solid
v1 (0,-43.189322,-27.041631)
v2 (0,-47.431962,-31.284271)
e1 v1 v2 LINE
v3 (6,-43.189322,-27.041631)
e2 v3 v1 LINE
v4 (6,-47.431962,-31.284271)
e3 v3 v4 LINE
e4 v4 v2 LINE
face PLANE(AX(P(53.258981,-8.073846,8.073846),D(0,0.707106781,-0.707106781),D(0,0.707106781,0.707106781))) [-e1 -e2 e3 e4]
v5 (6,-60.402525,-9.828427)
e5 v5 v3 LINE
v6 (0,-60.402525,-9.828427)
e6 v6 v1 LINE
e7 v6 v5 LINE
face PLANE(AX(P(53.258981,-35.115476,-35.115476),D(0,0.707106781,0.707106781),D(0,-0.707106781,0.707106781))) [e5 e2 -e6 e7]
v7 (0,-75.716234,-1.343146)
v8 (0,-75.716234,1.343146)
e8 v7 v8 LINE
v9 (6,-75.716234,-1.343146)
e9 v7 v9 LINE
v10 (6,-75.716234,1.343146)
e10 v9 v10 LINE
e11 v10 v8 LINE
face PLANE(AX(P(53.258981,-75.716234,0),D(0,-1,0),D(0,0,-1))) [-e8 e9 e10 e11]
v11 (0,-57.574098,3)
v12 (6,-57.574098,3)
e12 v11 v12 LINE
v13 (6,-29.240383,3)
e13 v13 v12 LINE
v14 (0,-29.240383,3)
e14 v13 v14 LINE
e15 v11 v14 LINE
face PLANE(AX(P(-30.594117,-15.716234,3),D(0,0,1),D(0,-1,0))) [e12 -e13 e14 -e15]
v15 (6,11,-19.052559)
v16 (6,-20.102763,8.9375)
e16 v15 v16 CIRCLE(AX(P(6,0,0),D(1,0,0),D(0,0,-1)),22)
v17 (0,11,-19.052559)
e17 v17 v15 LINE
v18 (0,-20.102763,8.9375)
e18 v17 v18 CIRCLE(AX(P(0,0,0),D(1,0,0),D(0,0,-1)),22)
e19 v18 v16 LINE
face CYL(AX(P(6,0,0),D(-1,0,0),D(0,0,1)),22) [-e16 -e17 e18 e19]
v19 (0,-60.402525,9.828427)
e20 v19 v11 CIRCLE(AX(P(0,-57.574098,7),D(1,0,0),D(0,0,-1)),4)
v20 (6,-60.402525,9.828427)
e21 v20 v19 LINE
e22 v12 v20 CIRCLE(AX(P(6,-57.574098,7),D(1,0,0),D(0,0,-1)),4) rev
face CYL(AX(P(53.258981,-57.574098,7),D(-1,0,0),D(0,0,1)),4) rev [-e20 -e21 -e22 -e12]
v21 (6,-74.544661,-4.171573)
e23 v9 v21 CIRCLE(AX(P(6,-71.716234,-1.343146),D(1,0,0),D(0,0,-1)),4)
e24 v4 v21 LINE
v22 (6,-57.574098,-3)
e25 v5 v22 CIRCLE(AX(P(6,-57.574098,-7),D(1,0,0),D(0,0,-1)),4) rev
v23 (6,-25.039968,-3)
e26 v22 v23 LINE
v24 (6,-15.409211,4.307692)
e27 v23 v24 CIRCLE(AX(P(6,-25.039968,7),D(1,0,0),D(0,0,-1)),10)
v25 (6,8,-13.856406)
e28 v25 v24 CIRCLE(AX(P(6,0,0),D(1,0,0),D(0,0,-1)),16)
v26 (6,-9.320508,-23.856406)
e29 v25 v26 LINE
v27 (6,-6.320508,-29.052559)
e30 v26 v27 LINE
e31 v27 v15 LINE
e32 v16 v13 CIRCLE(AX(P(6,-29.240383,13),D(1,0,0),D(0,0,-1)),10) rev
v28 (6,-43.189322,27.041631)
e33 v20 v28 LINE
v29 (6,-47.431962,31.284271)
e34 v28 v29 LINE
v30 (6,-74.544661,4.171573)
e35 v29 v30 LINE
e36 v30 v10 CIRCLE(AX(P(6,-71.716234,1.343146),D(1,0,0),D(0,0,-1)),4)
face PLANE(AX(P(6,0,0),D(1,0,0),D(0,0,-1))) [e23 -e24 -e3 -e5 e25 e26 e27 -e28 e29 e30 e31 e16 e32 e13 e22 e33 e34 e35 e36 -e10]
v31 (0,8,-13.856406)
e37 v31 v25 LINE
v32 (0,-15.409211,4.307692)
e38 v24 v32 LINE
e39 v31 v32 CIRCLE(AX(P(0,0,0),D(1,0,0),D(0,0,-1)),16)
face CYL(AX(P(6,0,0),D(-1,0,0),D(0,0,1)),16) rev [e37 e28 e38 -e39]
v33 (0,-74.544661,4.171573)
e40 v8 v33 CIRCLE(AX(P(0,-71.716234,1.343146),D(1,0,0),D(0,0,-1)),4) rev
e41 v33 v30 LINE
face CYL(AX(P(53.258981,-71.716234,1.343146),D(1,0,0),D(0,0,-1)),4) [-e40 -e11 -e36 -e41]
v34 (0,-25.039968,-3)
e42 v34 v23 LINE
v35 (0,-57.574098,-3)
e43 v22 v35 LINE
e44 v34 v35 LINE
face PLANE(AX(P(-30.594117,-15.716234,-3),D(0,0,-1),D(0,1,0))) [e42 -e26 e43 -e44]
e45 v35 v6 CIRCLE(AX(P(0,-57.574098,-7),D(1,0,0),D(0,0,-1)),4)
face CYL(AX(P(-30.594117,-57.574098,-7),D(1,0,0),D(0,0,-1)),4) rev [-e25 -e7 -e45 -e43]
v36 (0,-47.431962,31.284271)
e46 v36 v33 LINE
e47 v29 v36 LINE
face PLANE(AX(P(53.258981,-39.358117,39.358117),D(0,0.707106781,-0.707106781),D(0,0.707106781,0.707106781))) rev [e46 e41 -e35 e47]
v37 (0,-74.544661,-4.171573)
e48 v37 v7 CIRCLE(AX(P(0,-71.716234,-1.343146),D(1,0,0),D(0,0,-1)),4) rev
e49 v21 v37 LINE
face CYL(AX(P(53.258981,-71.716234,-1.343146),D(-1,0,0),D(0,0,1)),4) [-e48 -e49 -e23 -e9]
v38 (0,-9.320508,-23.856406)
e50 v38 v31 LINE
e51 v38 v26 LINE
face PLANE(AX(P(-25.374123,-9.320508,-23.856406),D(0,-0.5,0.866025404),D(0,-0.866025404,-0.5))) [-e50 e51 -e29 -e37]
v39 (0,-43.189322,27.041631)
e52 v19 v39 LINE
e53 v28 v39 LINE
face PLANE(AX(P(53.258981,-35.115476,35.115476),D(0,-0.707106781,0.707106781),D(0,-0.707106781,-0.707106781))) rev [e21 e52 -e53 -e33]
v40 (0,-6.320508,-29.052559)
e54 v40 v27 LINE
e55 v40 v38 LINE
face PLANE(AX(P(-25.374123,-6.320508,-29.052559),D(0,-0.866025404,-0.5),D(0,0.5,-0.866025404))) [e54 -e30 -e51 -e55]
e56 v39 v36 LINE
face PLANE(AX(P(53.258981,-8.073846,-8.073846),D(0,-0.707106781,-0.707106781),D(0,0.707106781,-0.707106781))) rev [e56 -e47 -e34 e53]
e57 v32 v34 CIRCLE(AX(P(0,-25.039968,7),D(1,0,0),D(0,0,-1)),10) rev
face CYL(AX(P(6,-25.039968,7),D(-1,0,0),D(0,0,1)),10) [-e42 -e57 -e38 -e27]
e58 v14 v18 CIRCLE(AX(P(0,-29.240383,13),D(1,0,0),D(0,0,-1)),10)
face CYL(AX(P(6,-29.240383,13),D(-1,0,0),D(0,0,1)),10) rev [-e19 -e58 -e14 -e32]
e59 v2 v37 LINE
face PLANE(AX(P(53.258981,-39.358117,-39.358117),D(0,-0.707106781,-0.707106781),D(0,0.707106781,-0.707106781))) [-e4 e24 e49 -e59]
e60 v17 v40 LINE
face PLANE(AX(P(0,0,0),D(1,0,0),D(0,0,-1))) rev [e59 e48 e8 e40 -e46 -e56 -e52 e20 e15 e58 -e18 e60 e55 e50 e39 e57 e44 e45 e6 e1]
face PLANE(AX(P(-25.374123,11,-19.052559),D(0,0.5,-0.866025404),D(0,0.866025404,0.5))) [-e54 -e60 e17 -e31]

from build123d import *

# Parameters (mm, degrees)
SKETCH1_R           = 22
SKETCH1_R_2         = 16
BOSS_EXTRUDE1_DEPTH = 6
BOSS_EXTRUDE2_DEPTH = 6
CUT_EXTRUDE1_DEPTH  = 37.933063475
SKETCH4_W           = 6
SKETCH4_H           = 30
BOSS_EXTRUDE3_DEPTH = 6
CUT_EXTRUDE2_DEPTH  = 55.497937543
FILLET1_R           = 10
FILLET2_R           = 10
SKETCH6_W           = 6
SKETCH6_H           = 30
BOSS_EXTRUDE4_DEPTH = 6
FILLET3_R           = 4


with BuildPart() as part:
    # Sketch1 → Boss-Extrude1 (new body)
    with BuildSketch(Plane(origin=(0, 0, 0), x_dir=(0, 0, -1), z_dir=(1, 0, 0))):
        Circle(SKETCH1_R)
        Circle(SKETCH1_R_2, mode=Mode.SUBTRACT)
    extrude(amount=BOSS_EXTRUDE1_DEPTH)

    # Sketch2 → Boss-Extrude2 (add)
    with BuildSketch(Plane(origin=(6, 0, 0), x_dir=(0, 0, -1), z_dir=(1, 0, 0))):
        Polygon((19.052558883, 11), (29.052558883, -6.320508076), (23.856406461, -9.320508076), (13.856406461, 8), align=None)
    extrude(amount=-BOSS_EXTRUDE2_DEPTH)

    # Sketch3 → Cut-Extrude1 (cut, through all)
    with BuildSketch(Plane(origin=(6, 0, 0), x_dir=(0, 0, -1), z_dir=(1, 0, 0))):
        with BuildLine():
            ThreePointArc((16, 0), (12.693653445, -9.740182864), (4.141104722, -15.454813221))
            Line((4.141104722, -15.454813221), (5.694018992, -21.250368178))
            ThreePointArc((5.694018992, -21.250368178), (15.779826764, -15.329614062), (21.406240896, -5.076696831))
            Line((21.406240896, -5.076696831), (13.856406461, 8))
            ThreePointArc((13.856406461, 8), (15.454813221, 4.141104722), (16, 0))
        make_face()
    extrude(amount=-CUT_EXTRUDE1_DEPTH, mode=Mode.SUBTRACT)

    # Sketch4 → Boss-Extrude3 (add)
    with BuildSketch(Plane(origin=(6, 0, 0), x_dir=(0, 0, -1), z_dir=(1, 0, 0))):
        with Locations((0, -30.716233646)):
            Rectangle(SKETCH4_W, SKETCH4_H)
    extrude(amount=-BOSS_EXTRUDE3_DEPTH)

    # Sketch5 → Cut-Extrude2 (cut, through all)
    with BuildSketch(Plane(origin=(6, 0, 0), x_dir=(0, 0, -1), z_dir=(1, 0, 0))):
        with BuildLine():
            Line((3, -21.794494718), (3, -15.716233646))
            Line((3, -15.716233646), (4.141104722, -15.454813221))
            Line((4.141104722, -15.454813221), (5.694018992, -21.250368178))
            ThreePointArc((5.694018992, -21.250368178), (4.374209957, -21.657103353), (3, -21.794494718))
        make_face()
    extrude(amount=-CUT_EXTRUDE2_DEPTH, mode=Mode.SUBTRACT)

    # Fillet1
    # the kernel refuses this fillet: 10 mm, written as the material it adds along each edge
    with BuildSketch(Plane(origin=(6, -21.794494718, 3), x_dir=(0, -1, 0), z_dir=(-1, 0, 0))) as fillet1_piece_1:
        with BuildLine():
            CenterArc((7.445888317, 10), FILLET1_R, 203.969482318, 66.030517682)
            ThreePointArc((-1.691731382, 5.9375), (-0.636552127, 3.028388286), (0, 0))
            Line((0, 0), (7.445888317, 0))
        make_face()
    extrude(amount=6)
    # the kernel refuses this fillet: 10 mm, written as the material it takes off along each edge
    with BuildSketch(Plane(origin=(28.912878475, -15.716233646, -3), x_dir=(0, -1, 0), z_dir=(-1, 0, 0))) as fillet1_2_piece_1:
        with BuildLine():
            CenterArc((9.16515139, 10), FILLET1_R, 203.578178478, 66.421821522)
            Line((0, 6), (0, 0))
            Line((0, 0), (9.16515139, 0))
        make_face()
    extrude(amount=51.82575695, mode=Mode.SUBTRACT)

    # Fillet2
    fillet2_edges = [part.edges().sort_by_distance(p)[0] for p in [
        (3, -15.716233646, 3),
    ]]
    fillet(fillet2_edges, radius=FILLET2_R)

    # Sketch6 → Boss-Extrude4 (add)
    with BuildSketch(Plane.ZY):
        Polygon((27.04163056, -43.189321711), (3, -67.230952271), (3, -75.716233646), (31.284271247, -47.431962398), align=None)
        with Locations((0, -60.716233646)):
            Rectangle(SKETCH6_W, SKETCH6_H)
    boss_extrude4 = extrude(amount=-BOSS_EXTRUDE4_DEPTH)

    # Mirror1: Boss-Extrude4 across plane
    add(boss_extrude4.mirror(Plane.XY))

    # Fillet3
    fillet3_edges = [part.edges().sort_by_distance(p)[0] for p in [
        (3, -75.716233646, 3),
        (3, -75.716233646, -3),
        (3, -67.230952271, 3),
        (3, -67.230952271, -3),
    ]]
    fillet(fillet3_edges, radius=FILLET3_R)


solid = part.part
